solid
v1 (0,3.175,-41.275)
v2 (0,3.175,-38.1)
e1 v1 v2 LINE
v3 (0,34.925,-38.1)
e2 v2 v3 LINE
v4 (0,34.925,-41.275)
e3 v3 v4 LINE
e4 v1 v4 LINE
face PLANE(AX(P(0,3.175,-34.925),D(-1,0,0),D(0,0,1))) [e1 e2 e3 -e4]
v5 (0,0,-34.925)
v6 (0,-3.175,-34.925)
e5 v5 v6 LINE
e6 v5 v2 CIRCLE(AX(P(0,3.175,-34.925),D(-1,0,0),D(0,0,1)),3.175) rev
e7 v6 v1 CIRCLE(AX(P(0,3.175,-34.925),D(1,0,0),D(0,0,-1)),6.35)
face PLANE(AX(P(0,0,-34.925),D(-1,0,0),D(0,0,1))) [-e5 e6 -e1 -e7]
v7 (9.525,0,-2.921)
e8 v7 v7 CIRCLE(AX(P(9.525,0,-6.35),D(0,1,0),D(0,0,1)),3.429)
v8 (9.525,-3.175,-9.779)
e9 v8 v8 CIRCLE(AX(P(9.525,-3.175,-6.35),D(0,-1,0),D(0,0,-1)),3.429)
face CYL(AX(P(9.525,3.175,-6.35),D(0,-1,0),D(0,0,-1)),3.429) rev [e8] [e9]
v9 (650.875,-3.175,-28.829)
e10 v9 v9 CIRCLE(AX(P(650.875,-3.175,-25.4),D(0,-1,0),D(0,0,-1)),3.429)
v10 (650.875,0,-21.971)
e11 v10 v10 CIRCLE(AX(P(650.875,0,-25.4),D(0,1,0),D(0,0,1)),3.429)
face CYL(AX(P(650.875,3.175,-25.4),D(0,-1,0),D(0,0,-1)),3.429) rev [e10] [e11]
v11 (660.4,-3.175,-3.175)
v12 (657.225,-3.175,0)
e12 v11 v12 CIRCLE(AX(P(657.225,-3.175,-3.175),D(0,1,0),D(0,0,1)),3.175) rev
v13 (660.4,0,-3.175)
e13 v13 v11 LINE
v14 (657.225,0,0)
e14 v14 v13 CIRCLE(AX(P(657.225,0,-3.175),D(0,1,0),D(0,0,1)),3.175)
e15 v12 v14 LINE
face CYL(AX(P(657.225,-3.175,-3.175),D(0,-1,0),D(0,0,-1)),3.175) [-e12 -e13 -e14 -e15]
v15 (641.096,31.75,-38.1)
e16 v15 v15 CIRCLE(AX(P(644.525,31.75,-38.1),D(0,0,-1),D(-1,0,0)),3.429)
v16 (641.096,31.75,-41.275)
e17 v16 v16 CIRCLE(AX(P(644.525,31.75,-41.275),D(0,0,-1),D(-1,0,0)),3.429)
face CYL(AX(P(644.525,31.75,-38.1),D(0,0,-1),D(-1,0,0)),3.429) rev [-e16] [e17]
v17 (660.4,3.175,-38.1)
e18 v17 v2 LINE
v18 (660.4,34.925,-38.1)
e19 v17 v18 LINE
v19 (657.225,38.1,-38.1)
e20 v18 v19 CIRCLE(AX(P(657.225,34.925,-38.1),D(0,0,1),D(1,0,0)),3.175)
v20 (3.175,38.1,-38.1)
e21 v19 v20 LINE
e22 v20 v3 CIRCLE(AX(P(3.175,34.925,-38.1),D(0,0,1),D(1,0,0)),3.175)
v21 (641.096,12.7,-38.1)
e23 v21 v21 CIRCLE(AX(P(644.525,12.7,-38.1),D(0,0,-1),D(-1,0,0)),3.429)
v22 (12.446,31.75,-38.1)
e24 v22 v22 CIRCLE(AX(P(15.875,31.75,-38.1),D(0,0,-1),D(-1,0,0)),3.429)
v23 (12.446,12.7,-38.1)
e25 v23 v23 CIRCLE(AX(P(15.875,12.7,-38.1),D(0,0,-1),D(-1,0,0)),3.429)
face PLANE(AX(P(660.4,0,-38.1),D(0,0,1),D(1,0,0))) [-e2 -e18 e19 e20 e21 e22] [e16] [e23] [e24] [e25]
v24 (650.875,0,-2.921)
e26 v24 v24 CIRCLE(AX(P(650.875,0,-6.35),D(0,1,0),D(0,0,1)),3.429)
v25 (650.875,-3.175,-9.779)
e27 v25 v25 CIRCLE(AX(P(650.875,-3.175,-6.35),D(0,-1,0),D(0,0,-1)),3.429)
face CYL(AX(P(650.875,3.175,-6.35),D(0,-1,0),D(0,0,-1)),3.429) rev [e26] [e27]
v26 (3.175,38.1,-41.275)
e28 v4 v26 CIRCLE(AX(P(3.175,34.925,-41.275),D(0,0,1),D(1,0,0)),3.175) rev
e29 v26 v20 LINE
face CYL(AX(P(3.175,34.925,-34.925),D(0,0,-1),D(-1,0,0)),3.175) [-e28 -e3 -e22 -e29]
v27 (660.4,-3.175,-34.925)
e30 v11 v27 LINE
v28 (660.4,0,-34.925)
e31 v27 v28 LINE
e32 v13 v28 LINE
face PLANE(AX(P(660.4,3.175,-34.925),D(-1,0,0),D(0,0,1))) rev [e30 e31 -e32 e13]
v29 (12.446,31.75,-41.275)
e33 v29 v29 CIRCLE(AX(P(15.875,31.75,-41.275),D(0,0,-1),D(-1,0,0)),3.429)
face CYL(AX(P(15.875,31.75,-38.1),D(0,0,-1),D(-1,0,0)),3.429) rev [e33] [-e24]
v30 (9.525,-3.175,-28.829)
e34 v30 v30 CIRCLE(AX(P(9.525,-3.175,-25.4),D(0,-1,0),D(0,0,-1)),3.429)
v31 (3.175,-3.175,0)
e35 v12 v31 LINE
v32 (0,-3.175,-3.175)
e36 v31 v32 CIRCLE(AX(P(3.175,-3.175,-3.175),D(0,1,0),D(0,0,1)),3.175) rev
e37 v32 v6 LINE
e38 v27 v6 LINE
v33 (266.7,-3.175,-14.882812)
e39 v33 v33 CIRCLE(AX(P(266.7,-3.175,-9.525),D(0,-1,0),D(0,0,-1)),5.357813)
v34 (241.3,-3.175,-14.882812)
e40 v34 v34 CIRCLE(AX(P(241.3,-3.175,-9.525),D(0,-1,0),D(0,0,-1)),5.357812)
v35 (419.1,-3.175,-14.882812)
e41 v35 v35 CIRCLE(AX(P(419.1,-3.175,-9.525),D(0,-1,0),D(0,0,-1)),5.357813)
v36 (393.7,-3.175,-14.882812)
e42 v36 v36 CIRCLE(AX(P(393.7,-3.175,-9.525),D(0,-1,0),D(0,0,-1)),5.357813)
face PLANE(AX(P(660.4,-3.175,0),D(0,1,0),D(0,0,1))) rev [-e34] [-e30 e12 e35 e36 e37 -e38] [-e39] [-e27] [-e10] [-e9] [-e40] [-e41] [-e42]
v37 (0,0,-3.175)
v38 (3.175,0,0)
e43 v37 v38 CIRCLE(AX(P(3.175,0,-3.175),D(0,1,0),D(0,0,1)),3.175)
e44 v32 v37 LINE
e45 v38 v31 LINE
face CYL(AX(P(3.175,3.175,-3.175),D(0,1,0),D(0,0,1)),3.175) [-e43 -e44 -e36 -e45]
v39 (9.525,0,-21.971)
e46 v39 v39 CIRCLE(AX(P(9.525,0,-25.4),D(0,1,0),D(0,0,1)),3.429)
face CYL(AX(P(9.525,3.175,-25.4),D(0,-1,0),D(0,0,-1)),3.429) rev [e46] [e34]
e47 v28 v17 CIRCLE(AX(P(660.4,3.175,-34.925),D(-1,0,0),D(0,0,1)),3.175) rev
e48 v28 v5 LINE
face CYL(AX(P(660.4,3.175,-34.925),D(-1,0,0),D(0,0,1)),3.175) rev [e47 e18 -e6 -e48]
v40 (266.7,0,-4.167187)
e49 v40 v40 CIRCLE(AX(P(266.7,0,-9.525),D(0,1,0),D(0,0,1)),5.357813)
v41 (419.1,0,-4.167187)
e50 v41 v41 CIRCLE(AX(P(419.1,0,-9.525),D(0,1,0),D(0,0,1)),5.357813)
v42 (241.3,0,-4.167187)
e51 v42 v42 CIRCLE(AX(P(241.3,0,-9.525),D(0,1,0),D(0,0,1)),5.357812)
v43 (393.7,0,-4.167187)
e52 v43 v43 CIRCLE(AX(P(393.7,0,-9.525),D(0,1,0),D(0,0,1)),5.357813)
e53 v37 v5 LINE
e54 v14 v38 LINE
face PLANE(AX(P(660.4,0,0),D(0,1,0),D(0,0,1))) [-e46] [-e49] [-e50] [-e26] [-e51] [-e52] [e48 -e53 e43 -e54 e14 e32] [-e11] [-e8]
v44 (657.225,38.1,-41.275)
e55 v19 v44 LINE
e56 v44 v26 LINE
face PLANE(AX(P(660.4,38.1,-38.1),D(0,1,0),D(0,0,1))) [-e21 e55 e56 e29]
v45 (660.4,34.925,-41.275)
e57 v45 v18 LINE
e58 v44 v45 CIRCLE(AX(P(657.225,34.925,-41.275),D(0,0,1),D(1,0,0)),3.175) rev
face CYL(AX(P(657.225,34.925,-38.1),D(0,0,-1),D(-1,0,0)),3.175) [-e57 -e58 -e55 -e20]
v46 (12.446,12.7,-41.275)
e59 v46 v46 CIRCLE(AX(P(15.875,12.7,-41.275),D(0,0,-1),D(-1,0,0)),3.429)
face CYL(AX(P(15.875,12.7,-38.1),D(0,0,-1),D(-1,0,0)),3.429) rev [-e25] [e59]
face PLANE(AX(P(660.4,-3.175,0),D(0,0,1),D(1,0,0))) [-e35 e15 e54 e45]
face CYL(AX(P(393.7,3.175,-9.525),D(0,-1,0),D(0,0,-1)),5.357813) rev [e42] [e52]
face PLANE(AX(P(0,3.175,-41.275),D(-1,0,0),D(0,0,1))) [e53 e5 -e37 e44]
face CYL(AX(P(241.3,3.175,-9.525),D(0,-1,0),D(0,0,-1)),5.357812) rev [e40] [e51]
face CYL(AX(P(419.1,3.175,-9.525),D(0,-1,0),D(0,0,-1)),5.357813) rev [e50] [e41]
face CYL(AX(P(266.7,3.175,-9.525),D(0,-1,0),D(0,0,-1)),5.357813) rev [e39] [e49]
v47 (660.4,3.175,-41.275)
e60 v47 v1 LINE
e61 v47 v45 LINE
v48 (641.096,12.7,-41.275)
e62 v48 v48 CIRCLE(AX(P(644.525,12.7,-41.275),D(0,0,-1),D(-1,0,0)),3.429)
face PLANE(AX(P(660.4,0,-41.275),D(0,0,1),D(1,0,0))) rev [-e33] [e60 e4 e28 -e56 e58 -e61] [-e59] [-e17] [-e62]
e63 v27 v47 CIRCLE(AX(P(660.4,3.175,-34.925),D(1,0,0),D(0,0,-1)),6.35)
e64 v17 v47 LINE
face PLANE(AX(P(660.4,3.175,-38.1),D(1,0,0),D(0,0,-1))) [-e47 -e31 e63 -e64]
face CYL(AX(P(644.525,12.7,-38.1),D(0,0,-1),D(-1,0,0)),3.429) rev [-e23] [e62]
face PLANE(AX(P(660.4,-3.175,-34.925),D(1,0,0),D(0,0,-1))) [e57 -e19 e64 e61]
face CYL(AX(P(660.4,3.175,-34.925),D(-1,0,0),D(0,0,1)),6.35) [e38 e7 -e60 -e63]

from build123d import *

# Parameters (mm, degrees)
BASE_FLANGE1_DEPTH = 660.4
SKETCH3_R          = 3.429
SKETCH3_R_2        = 5.3578125
CUT_EXTRUDE2_DEPTH = 6.35
FILLET1_R          = 3.175
SKETCH4_R          = 3.429
CUT_EXTRUDE3_DEPTH = 3.175


# Sheet-metal steps are written as plain solids
with BuildPart() as part:
    # Sketch1 → Base-Flange1 (new body)
    with BuildSketch(Plane(origin=(0, 0, 0), x_dir=(0, 0, -1), z_dir=(1, 0, 0))):
        with BuildLine():
            Line((0, 0), (34.925, 0))
            ThreePointArc((34.925, 0), (37.17006403, 0.92993597), (38.1, 3.175))
            Line((38.1, 3.175), (38.1, 38.1))
            Line((38.1, 38.1), (41.275, 38.1))
            Line((41.275, 38.1), (41.275, 3.175))
            ThreePointArc((41.275, 3.175), (39.415128061, -1.315128061), (34.925, -3.175))
            Line((34.925, -3.175), (0, -3.175))
            Line((0, -3.175), (0, 0))
        make_face()
    extrude(amount=BASE_FLANGE1_DEPTH)

    # Sketch3 → Cut-Extrude2 (cut)
    with BuildSketch(Plane.XZ.offset(3.175)):
        with Locations(Location((9.525, -25.4, 0), (0, 0, 270))):
            Circle(SKETCH3_R)
        with Locations(Location((9.525, -6.35, 0), (0, 0, 270))):
            Circle(SKETCH3_R)
        with Locations(Location((650.875, -25.4, 0), (0, 0, 270))):
            Circle(SKETCH3_R)
        with Locations(Location((650.875, -6.35, 0), (0, 0, 270))):
            Circle(SKETCH3_R)
        with Locations(Location((241.3, -9.525, 0), (0, 0, 270))):
            Circle(SKETCH3_R_2)
        with Locations(Location((419.1, -9.525, 0), (0, 0, 270))):
            Circle(SKETCH3_R_2)
        with Locations(Location((266.7, -9.525, 0), (0, 0, 270))):
            Circle(SKETCH3_R_2)
        with Locations(Location((393.7, -9.525, 0), (0, 0, 270))):
            Circle(SKETCH3_R_2)
    extrude(amount=-CUT_EXTRUDE2_DEPTH, mode=Mode.SUBTRACT)

    # Fillet1
    fillet1_edges = [part.edges().sort_by_distance(p)[0] for p in [
        (660.4, -1.5875, 0),
        (0, -1.5875, 0),
        (660.4, 38.1, -39.6875),
        (0, 38.1, -39.6875),
    ]]
    fillet(fillet1_edges, radius=FILLET1_R)

    # Sketch4 → Cut-Extrude3 (cut)
    with BuildSketch(Plane(origin=(0, 0, -41.275), x_dir=(-1, 0, 0), z_dir=(0, 0, -1))):
        with Locations((-644.525, 31.75)):
            Circle(SKETCH4_R)
        with Locations((-644.525, 12.7)):
            Circle(SKETCH4_R)
        with Locations((-15.875, 31.75)):
            Circle(SKETCH4_R)
        with Locations((-15.875, 12.7)):
            Circle(SKETCH4_R)
    extrude(amount=-CUT_EXTRUDE3_DEPTH, mode=Mode.SUBTRACT)


solid = part.part
